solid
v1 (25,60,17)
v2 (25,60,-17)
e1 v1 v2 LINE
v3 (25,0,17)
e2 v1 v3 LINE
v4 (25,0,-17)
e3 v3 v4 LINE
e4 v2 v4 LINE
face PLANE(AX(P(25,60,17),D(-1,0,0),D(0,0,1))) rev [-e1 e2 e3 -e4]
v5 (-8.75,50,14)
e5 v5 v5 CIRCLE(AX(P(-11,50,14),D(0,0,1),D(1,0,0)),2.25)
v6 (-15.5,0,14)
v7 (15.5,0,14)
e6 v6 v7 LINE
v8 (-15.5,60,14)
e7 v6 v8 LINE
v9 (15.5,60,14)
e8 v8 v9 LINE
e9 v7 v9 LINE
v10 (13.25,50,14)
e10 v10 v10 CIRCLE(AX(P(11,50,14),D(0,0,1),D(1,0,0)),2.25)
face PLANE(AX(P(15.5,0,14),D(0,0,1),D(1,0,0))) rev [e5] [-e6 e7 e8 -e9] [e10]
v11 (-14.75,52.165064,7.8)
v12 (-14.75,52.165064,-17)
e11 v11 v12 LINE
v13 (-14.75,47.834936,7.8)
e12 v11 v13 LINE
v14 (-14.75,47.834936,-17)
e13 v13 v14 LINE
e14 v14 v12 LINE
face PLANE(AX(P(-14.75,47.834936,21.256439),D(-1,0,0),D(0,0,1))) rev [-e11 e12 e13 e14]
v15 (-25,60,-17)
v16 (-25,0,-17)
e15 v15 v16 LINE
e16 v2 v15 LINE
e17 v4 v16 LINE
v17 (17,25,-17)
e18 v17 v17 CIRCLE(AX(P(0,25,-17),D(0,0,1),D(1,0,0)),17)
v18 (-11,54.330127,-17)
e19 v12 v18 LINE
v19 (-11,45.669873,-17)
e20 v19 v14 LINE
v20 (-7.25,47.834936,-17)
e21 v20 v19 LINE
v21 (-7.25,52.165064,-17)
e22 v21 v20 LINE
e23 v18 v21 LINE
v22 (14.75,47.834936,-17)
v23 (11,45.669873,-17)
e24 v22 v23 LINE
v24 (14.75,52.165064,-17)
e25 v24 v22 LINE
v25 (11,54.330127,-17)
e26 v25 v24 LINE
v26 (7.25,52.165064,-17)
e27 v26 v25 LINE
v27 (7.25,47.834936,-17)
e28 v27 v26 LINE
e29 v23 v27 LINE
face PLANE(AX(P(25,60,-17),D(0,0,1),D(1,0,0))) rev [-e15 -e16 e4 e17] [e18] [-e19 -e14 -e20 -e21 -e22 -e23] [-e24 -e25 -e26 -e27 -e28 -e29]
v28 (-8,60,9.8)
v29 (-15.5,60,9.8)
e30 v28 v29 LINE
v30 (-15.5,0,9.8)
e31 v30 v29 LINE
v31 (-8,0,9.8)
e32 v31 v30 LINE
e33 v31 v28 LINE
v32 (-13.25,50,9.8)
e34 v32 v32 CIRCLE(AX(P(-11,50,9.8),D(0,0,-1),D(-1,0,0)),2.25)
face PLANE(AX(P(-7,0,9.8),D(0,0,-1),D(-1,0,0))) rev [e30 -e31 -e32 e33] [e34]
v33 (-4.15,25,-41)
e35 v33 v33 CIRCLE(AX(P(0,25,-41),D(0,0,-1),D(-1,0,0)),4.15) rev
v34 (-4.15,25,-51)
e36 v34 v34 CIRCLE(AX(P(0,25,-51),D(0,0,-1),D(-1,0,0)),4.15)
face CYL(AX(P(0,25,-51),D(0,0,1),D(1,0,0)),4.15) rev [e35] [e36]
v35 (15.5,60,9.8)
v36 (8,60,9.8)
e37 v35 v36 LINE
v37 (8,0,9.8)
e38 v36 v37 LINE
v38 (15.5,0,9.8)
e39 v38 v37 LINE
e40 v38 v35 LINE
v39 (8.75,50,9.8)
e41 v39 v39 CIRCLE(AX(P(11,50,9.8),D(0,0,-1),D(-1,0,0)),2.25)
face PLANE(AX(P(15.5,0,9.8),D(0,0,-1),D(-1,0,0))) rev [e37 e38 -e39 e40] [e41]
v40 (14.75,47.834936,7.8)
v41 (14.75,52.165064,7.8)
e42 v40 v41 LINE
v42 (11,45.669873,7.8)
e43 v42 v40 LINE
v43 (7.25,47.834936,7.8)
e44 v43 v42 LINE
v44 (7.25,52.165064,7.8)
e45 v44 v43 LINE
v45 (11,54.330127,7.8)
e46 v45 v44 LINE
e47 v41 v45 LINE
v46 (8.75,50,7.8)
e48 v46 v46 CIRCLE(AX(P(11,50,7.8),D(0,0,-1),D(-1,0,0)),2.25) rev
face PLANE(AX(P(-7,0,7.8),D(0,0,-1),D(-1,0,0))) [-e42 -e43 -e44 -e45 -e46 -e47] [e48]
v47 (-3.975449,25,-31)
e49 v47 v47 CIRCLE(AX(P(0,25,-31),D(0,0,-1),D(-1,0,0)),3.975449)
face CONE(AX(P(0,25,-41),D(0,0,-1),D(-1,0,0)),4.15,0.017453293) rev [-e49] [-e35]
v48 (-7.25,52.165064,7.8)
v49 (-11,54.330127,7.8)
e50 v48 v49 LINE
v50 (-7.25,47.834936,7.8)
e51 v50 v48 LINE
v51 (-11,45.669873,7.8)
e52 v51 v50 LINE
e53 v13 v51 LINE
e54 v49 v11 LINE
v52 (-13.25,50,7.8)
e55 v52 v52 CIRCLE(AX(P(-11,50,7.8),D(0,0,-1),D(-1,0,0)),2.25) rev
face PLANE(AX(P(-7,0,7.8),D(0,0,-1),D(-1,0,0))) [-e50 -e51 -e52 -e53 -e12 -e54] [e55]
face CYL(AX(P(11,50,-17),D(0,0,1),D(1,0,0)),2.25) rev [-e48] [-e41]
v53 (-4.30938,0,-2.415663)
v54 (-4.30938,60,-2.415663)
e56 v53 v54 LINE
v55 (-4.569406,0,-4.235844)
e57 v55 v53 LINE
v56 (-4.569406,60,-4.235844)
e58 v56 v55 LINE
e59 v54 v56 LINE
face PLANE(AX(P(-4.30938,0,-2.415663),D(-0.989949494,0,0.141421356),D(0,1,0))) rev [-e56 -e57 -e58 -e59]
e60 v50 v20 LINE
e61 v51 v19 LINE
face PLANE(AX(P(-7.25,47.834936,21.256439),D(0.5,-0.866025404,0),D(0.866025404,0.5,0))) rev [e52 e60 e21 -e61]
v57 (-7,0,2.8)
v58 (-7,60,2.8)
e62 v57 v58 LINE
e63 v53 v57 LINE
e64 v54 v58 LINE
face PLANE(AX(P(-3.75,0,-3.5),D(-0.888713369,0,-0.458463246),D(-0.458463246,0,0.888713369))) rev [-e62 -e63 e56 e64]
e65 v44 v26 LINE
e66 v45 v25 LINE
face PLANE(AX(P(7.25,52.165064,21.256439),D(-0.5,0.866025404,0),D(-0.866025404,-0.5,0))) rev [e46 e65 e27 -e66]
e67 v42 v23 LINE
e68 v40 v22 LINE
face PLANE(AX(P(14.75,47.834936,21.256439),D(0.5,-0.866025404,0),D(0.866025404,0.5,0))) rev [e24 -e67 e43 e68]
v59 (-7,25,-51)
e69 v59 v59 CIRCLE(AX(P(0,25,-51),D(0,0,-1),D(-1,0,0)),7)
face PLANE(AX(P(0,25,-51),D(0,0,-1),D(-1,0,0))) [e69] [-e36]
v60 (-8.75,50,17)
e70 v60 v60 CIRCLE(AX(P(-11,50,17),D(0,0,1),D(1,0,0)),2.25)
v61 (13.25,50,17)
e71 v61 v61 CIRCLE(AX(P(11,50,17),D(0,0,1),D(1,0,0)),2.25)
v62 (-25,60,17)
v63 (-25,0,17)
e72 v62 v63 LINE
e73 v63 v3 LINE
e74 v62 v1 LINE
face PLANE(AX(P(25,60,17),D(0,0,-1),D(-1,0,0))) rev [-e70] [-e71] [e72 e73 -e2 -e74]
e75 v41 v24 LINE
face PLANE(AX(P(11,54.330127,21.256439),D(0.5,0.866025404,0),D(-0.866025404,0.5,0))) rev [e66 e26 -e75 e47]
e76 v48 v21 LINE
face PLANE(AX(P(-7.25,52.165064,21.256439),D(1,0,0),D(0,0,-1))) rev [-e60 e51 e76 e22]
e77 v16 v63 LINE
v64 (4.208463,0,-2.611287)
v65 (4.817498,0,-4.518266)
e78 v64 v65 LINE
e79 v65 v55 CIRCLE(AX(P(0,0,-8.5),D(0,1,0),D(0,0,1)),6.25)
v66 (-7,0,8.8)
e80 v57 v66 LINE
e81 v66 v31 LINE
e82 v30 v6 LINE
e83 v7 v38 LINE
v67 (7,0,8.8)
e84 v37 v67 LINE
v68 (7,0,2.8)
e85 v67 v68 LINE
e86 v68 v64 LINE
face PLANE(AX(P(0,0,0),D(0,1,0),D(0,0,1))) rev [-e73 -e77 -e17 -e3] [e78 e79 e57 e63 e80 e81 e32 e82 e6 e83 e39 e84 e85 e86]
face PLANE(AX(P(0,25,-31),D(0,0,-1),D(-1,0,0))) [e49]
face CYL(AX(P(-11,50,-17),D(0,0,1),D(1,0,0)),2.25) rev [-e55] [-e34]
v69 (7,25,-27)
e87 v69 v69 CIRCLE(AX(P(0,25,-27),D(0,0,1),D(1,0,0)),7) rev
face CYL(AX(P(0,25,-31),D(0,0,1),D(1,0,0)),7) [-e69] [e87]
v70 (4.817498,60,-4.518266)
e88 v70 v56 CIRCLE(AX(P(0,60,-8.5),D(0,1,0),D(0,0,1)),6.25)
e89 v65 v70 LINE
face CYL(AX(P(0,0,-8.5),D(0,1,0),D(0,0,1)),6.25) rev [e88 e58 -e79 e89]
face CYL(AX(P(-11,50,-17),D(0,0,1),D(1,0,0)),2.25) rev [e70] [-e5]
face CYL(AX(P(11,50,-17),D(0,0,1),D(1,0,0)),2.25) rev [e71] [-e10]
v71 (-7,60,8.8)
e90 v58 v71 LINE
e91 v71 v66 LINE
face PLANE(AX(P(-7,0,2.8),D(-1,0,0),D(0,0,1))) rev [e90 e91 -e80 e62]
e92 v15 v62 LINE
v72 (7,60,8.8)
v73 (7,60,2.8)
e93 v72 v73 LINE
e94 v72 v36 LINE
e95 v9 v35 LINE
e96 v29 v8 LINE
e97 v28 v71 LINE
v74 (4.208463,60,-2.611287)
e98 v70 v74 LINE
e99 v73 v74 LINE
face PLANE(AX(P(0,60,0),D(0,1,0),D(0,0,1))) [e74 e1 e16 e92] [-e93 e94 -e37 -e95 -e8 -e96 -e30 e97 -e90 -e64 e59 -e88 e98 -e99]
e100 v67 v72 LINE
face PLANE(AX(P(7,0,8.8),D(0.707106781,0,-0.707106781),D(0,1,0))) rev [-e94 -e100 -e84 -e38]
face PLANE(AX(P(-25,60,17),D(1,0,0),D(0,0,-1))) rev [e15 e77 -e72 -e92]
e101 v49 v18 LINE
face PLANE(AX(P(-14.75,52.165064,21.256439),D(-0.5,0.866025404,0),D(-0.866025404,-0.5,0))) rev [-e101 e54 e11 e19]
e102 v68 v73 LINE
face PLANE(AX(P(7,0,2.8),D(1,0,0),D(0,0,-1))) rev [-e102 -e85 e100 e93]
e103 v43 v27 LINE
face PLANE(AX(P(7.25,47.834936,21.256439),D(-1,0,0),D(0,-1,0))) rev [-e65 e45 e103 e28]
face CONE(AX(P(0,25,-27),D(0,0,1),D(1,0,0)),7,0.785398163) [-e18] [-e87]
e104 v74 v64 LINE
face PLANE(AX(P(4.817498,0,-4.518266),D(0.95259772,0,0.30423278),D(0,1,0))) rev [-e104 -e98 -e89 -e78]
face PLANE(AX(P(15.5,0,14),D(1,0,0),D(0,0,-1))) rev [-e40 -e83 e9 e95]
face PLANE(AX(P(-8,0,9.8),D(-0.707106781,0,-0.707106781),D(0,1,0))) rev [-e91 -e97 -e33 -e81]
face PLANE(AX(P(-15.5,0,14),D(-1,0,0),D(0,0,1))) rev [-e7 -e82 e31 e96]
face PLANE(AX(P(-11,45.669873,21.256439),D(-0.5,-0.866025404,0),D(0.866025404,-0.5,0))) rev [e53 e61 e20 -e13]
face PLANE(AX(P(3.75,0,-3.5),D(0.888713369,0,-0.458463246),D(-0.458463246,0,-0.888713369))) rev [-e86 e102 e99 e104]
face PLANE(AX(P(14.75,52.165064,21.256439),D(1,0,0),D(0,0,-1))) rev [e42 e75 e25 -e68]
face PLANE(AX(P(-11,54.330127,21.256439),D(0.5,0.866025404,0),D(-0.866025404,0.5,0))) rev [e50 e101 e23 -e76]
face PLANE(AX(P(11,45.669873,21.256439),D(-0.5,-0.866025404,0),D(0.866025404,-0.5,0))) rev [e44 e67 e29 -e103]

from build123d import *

# Parameters (mm, degrees)
SKETCH1_W           = 50
SKETCH1_H           = 34
BOSS_EXTRUDE1_DEPTH = 60
CUT_EXTRUDE1_DEPTH  = 68.186308129
SKETCH3_R           = 2.25
CUT_EXTRUDE2_DEPTH  = 74.35529974
CUT_EXTRUDE3_DEPTH  = 24.8
CHAMFER1_SIZE       = 1
CHAMFER1_SIZE_2     = 1.220120443
SKETCH5_R           = 7
BOSS_EXTRUDE2_DEPTH = 14
SKETCH6_R           = 7
SKETCH6_R_2         = 4.15
BOSS_EXTRUDE3_DEPTH = 20
CHAMFER2_SIZE       = 10
CHAMFER2_SIZE2      = 0.174550649
CHAMFER4_SIZE       = 10


with BuildPart() as part:
    # Sketch1 → Boss-Extrude1 (new body)
    with BuildSketch(Plane(origin=(0, 0, 0), x_dir=(1, 0, 0), z_dir=(0, 1, 0))):
        Rectangle(SKETCH1_W, SKETCH1_H)
    extrude(amount=BOSS_EXTRUDE1_DEPTH)

    # Sketch2 → Cut-Extrude1 (cut, through all)
    with BuildSketch(Plane(origin=(0, 60, 0), x_dir=(1, 0, 0), z_dir=(0, 1, 0))):
        with BuildLine():
            Line((-3.75, 3.5), (-7, -2.8))
            Line((-7, -2.8), (-7, -9.8))
            Line((-7, -9.8), (-15.5, -9.8))
            Line((-15.5, -9.8), (-15.5, -14))
            Line((-15.5, -14), (15.5, -14))
            Line((15.5, -14), (15.5, -9.8))
            Line((15.5, -9.8), (7, -9.8))
            Line((7, -9.8), (7, -2.8))
            Line((7, -2.8), (3.75, 3.5))
            ThreePointArc((3.75, 3.5), (0, 14.75), (-3.75, 3.5))
        make_face()
    extrude(amount=-CUT_EXTRUDE1_DEPTH, mode=Mode.SUBTRACT)

    # Sketch3 → Cut-Extrude2 (cut, through all)
    with BuildSketch(Plane.XY.offset(17)):
        with Locations((-11, 50)):
            Circle(SKETCH3_R)
        with Locations((11, 50)):
            Circle(SKETCH3_R)
    extrude(amount=-CUT_EXTRUDE2_DEPTH, mode=Mode.SUBTRACT)

    # Sketch4 → Cut-Extrude3 (cut)
    with BuildSketch(Plane(origin=(0, 0, -17), x_dir=(-1, 0, 0), z_dir=(0, 0, -1))):
        Polygon((14.75, 52.165063509), (11, 54.330127019), (7.25, 52.165063509), (7.25, 47.834936491), (11, 45.669872981), (14.75, 47.834936491), align=None)
        Polygon((-7.25, 47.834936491), (-7.25, 52.165063509), (-11, 54.330127019), (-14.75, 52.165063509), (-14.75, 47.834936491), (-11, 45.669872981), align=None)
    extrude(amount=-CUT_EXTRUDE3_DEPTH, mode=Mode.SUBTRACT)

    # Chamfer1
    # the kernel refuses this chamfer: 1.220120443, 1 mm, written as the material it takes off along each edge
    with BuildSketch(Plane(origin=(-7, 62.571682988, 9.8), x_dir=(-1, 0, 0), z_dir=(0, -1, 0)), Plane(origin=(7, 62.571682988, 9.8), x_dir=(0, 0, -1), z_dir=(0, -1, 0))) as chamfer1_piece_1:
        Polygon((CHAMFER1_SIZE, 0), (0, CHAMFER1_SIZE), (0, 0), align=None)
    extrude(amount=65.143365976, mode=Mode.SUBTRACT)
    with BuildSketch(Plane(origin=(-3.75, 63.150527813, -3.5), x_dir=(-0.45846324589157744, 0, 0.8887133689590581), z_dir=(0, -1, 0))) as chamfer1_piece_2:
        with BuildLine():
            Line((CHAMFER1_SIZE_2, 0), (-0.278286757, 1.065574765))
            ThreePointArc((-0.278286757, 1.065574765), (-0.120412167, 0.557139368), (0, 0))
            Line((0, 0), (CHAMFER1_SIZE_2, 0))
        make_face()
    extrude(amount=66.301055626, mode=Mode.SUBTRACT)
    with BuildSketch(Plane(origin=(3.75, 63.795705698, -3.5), x_dir=(0.7235959376340886, 0, -0.6902238180760238), z_dir=(0, -1, 0))) as chamfer1_piece_3:
        with BuildLine():
            Line((1.475268649, 0), (-CHAMFER1_SIZE * 0.281668992416, CHAMFER1_SIZE * 0.959511635527))
            Line((-CHAMFER1_SIZE * 0.281668992416, CHAMFER1_SIZE * 0.959511635527), (0, 0))
            ThreePointArc((0, 0), (0.759242358, 0.043643641), (1.475268649, 0))
        make_face()
    extrude(amount=67.591411396, mode=Mode.SUBTRACT)

    # Sketch5 → Boss-Extrude2 (add)
    with BuildSketch(Plane(origin=(0, 0, -17), x_dir=(-1, 0, 0), z_dir=(0, 0, -1))):
        with Locations(Location((0, 25, 0), (0, 0, 180))):
            Circle(SKETCH5_R)
    extrude(amount=BOSS_EXTRUDE2_DEPTH)

    # Sketch6 → Boss-Extrude3 (add)
    with BuildSketch(Plane(origin=(0, 0, -31), x_dir=(-1, 0, 0), z_dir=(0, 0, -1))):
        with Locations(Location((0, 25, 0), (0, 0, 180))):
            Circle(SKETCH6_R)
        with Locations((0, 25)):
            Circle(SKETCH6_R_2, mode=Mode.SUBTRACT)
    extrude(amount=BOSS_EXTRUDE3_DEPTH)

    # Chamfer2
    chamfer2_edges = [part.edges().sort_by_distance(p)[0] for p in [
        (4.15, 25, -31),
    ]]
    chamfer2_side = [part.faces().sort_by_distance(p)[0] for p in [
        (4.15, 25, -41),
    ]]
    chamfer(chamfer2_edges, length=CHAMFER2_SIZE, length2=CHAMFER2_SIZE2, reference=chamfer2_side[0])

    # Chamfer4
    chamfer4_edges = [part.edges().sort_by_distance(p)[0] for p in [
        (-7, 25, -17),
    ]]
    chamfer(chamfer4_edges, length=CHAMFER4_SIZE)


solid = part.part
